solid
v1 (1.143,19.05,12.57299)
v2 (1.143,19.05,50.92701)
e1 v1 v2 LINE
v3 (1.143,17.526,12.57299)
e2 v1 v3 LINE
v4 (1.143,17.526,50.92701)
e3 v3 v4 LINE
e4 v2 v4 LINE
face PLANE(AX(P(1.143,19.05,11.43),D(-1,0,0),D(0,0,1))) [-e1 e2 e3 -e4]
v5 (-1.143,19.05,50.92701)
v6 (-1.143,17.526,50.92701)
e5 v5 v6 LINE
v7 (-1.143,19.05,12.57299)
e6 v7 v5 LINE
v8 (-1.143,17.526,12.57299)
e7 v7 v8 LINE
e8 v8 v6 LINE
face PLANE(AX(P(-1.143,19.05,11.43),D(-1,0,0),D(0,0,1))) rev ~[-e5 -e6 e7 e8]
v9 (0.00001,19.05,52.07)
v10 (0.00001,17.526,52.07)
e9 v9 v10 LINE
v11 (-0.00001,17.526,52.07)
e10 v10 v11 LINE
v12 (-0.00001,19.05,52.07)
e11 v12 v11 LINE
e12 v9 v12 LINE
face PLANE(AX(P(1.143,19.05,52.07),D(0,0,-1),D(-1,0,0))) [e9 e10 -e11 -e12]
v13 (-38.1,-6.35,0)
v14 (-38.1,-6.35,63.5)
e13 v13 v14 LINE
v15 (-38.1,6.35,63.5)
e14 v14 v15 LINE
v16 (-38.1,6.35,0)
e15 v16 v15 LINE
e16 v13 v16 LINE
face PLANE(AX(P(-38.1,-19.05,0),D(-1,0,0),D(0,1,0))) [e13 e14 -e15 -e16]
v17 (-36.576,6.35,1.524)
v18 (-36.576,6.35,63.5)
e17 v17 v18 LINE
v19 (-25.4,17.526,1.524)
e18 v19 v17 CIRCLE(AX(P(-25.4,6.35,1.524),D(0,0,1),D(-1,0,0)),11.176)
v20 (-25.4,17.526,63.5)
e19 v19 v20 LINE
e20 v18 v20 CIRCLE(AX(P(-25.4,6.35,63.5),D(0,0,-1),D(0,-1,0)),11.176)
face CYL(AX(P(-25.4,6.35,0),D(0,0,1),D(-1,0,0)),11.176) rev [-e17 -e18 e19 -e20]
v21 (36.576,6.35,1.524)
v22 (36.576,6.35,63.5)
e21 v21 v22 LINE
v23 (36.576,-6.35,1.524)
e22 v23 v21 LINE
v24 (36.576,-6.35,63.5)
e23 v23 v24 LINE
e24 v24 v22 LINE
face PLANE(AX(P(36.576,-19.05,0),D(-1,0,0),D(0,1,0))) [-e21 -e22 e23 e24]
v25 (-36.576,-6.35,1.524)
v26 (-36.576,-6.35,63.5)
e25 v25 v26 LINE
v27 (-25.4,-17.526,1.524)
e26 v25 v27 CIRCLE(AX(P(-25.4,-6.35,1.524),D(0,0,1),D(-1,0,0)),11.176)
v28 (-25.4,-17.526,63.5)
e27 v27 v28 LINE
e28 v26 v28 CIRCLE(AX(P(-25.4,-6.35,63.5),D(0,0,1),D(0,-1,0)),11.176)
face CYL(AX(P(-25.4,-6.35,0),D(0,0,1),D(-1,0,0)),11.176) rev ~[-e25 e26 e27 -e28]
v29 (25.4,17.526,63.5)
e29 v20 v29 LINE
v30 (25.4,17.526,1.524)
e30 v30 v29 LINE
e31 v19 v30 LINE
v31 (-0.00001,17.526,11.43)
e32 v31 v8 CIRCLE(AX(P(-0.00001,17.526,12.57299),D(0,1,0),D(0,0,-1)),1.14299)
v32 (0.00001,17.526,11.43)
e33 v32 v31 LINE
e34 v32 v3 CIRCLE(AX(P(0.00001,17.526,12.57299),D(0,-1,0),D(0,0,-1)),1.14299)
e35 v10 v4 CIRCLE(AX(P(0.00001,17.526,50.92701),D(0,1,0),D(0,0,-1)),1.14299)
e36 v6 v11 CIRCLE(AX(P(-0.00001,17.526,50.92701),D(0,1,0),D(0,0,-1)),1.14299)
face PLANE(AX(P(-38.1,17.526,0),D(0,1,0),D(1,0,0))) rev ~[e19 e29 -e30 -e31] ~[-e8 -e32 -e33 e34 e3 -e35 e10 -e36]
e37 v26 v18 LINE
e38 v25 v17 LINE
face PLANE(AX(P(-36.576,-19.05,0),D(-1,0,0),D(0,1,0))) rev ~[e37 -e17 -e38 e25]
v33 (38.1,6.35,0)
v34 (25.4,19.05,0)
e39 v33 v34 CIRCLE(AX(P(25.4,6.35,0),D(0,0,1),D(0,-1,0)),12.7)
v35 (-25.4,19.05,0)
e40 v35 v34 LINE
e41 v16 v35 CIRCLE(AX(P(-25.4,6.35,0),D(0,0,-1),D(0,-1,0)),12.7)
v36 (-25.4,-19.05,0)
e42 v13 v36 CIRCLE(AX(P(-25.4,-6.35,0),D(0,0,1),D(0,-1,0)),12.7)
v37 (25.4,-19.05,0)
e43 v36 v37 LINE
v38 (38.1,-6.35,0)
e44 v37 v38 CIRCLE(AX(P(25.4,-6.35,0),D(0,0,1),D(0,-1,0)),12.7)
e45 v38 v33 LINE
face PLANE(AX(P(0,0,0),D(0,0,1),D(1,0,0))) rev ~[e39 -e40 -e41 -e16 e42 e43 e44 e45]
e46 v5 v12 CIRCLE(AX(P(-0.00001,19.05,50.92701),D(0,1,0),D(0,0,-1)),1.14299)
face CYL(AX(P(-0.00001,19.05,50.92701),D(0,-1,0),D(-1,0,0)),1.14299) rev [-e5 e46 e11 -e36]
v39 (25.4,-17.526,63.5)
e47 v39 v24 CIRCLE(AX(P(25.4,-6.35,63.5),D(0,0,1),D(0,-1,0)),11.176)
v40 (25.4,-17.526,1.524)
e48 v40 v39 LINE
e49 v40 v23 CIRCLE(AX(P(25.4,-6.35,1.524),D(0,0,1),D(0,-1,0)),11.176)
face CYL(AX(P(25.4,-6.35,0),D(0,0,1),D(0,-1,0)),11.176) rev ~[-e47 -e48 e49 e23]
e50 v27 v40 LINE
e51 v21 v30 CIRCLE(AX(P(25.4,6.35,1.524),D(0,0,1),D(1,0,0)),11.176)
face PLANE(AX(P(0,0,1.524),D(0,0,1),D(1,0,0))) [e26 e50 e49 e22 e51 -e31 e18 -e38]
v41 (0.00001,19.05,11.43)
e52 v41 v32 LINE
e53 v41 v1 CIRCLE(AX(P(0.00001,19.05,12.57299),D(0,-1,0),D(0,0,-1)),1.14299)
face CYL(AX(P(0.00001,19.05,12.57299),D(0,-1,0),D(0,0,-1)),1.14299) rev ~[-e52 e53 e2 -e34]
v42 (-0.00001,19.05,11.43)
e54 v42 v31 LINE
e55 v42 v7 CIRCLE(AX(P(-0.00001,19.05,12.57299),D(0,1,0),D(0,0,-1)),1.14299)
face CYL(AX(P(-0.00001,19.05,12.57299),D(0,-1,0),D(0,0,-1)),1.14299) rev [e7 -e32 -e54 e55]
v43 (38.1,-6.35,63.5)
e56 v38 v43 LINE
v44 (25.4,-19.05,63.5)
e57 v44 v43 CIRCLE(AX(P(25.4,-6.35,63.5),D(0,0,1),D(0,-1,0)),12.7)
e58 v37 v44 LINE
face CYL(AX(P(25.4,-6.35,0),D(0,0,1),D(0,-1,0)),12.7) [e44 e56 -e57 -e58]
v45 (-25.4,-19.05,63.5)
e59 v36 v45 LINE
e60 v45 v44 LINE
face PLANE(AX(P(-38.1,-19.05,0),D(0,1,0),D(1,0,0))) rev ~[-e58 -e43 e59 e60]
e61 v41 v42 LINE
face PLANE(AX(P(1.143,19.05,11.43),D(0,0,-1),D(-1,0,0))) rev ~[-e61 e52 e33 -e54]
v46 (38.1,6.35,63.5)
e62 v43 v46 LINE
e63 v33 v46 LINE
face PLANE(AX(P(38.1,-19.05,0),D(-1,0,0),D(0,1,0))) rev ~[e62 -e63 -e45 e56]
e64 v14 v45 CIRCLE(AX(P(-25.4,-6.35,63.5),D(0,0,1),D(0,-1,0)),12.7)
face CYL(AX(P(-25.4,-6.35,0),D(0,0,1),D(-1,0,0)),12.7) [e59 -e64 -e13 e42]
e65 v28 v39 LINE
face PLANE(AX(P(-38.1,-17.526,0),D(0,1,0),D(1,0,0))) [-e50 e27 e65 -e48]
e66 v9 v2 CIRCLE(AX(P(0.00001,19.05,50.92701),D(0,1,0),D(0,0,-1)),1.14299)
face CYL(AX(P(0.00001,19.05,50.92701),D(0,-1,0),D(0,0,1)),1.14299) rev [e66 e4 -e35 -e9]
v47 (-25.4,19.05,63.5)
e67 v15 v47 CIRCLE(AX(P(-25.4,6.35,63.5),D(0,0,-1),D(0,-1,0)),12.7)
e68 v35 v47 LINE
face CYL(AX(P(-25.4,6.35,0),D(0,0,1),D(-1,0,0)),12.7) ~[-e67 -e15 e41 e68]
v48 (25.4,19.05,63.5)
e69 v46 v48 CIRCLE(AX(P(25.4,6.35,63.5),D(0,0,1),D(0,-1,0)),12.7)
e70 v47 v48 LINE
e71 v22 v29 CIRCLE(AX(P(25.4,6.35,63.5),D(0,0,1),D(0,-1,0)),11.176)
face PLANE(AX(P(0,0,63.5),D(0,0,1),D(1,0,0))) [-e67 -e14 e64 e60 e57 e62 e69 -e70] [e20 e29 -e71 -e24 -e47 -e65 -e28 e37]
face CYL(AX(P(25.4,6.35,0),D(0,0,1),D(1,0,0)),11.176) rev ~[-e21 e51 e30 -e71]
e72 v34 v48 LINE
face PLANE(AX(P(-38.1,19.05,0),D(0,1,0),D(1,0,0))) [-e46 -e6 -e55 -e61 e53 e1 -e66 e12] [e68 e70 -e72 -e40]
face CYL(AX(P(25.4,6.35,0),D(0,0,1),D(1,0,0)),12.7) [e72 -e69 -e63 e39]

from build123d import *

# Parameters (mm, degrees)
F0_W     = 76.2
F0_H     = 38.1
F1_DEPTH = 63.5
F2_R     = 12.7
F3_T     = -1.524
F4_W     = 2.286
F4_H     = 40.64
F5_DEPTH = 1.524
F6_R     = 1.14299


# Not quite as in the source:
# - a fillet or chamfer is up to 0.001 mm smaller than in the source, because OpenCascade refuses the exact size


with BuildPart() as f1:
    # F0 (on Top) → F1 (new body)
    with BuildSketch(Plane.XY):
        Rectangle(F0_W, F0_H)
    extrude(amount=F1_DEPTH)

    # F2
    f2_edges = [f1.edges().sort_by_distance(p)[0] for p in [
        (38.1, -19.05, 31.75),
        (38.1, 19.05, 31.75),
        (-38.1, -19.05, 31.75),
        (-38.1, 19.05, 31.75),
    ]]
    fillet(f2_edges, radius=F2_R)

    # F3
    f3_openings = [f1.faces().sort_by_distance(p)[0] for p in [
        (0, 0, 63.5),
    ]]
    offset(amount=F3_T, openings=f3_openings)

    # F4 (on face) → F5 (cut, through all)
    with BuildSketch(Plane(origin=(0, 19.05, 0), x_dir=(-1, 0, 0), z_dir=(0, 1, 0))):
        with Locations((0, 31.75)):
            Rectangle(F4_W, F4_H)
    extrude(amount=-F5_DEPTH, mode=Mode.SUBTRACT)

    # F6 (radius 1.143 in the source; OpenCascade refuses exactly that, so slightly less here)
    f6_edges = [f1.edges().sort_by_distance(p)[0] for p in [
        (1.143, 18.288, 52.07),
        (-1.143, 18.288, 52.07),
        (1.143, 18.288, 11.43),
        (-1.143, 18.288, 11.43),
    ]]
    fillet(f6_edges, radius=F6_R)


solid = f1.part
